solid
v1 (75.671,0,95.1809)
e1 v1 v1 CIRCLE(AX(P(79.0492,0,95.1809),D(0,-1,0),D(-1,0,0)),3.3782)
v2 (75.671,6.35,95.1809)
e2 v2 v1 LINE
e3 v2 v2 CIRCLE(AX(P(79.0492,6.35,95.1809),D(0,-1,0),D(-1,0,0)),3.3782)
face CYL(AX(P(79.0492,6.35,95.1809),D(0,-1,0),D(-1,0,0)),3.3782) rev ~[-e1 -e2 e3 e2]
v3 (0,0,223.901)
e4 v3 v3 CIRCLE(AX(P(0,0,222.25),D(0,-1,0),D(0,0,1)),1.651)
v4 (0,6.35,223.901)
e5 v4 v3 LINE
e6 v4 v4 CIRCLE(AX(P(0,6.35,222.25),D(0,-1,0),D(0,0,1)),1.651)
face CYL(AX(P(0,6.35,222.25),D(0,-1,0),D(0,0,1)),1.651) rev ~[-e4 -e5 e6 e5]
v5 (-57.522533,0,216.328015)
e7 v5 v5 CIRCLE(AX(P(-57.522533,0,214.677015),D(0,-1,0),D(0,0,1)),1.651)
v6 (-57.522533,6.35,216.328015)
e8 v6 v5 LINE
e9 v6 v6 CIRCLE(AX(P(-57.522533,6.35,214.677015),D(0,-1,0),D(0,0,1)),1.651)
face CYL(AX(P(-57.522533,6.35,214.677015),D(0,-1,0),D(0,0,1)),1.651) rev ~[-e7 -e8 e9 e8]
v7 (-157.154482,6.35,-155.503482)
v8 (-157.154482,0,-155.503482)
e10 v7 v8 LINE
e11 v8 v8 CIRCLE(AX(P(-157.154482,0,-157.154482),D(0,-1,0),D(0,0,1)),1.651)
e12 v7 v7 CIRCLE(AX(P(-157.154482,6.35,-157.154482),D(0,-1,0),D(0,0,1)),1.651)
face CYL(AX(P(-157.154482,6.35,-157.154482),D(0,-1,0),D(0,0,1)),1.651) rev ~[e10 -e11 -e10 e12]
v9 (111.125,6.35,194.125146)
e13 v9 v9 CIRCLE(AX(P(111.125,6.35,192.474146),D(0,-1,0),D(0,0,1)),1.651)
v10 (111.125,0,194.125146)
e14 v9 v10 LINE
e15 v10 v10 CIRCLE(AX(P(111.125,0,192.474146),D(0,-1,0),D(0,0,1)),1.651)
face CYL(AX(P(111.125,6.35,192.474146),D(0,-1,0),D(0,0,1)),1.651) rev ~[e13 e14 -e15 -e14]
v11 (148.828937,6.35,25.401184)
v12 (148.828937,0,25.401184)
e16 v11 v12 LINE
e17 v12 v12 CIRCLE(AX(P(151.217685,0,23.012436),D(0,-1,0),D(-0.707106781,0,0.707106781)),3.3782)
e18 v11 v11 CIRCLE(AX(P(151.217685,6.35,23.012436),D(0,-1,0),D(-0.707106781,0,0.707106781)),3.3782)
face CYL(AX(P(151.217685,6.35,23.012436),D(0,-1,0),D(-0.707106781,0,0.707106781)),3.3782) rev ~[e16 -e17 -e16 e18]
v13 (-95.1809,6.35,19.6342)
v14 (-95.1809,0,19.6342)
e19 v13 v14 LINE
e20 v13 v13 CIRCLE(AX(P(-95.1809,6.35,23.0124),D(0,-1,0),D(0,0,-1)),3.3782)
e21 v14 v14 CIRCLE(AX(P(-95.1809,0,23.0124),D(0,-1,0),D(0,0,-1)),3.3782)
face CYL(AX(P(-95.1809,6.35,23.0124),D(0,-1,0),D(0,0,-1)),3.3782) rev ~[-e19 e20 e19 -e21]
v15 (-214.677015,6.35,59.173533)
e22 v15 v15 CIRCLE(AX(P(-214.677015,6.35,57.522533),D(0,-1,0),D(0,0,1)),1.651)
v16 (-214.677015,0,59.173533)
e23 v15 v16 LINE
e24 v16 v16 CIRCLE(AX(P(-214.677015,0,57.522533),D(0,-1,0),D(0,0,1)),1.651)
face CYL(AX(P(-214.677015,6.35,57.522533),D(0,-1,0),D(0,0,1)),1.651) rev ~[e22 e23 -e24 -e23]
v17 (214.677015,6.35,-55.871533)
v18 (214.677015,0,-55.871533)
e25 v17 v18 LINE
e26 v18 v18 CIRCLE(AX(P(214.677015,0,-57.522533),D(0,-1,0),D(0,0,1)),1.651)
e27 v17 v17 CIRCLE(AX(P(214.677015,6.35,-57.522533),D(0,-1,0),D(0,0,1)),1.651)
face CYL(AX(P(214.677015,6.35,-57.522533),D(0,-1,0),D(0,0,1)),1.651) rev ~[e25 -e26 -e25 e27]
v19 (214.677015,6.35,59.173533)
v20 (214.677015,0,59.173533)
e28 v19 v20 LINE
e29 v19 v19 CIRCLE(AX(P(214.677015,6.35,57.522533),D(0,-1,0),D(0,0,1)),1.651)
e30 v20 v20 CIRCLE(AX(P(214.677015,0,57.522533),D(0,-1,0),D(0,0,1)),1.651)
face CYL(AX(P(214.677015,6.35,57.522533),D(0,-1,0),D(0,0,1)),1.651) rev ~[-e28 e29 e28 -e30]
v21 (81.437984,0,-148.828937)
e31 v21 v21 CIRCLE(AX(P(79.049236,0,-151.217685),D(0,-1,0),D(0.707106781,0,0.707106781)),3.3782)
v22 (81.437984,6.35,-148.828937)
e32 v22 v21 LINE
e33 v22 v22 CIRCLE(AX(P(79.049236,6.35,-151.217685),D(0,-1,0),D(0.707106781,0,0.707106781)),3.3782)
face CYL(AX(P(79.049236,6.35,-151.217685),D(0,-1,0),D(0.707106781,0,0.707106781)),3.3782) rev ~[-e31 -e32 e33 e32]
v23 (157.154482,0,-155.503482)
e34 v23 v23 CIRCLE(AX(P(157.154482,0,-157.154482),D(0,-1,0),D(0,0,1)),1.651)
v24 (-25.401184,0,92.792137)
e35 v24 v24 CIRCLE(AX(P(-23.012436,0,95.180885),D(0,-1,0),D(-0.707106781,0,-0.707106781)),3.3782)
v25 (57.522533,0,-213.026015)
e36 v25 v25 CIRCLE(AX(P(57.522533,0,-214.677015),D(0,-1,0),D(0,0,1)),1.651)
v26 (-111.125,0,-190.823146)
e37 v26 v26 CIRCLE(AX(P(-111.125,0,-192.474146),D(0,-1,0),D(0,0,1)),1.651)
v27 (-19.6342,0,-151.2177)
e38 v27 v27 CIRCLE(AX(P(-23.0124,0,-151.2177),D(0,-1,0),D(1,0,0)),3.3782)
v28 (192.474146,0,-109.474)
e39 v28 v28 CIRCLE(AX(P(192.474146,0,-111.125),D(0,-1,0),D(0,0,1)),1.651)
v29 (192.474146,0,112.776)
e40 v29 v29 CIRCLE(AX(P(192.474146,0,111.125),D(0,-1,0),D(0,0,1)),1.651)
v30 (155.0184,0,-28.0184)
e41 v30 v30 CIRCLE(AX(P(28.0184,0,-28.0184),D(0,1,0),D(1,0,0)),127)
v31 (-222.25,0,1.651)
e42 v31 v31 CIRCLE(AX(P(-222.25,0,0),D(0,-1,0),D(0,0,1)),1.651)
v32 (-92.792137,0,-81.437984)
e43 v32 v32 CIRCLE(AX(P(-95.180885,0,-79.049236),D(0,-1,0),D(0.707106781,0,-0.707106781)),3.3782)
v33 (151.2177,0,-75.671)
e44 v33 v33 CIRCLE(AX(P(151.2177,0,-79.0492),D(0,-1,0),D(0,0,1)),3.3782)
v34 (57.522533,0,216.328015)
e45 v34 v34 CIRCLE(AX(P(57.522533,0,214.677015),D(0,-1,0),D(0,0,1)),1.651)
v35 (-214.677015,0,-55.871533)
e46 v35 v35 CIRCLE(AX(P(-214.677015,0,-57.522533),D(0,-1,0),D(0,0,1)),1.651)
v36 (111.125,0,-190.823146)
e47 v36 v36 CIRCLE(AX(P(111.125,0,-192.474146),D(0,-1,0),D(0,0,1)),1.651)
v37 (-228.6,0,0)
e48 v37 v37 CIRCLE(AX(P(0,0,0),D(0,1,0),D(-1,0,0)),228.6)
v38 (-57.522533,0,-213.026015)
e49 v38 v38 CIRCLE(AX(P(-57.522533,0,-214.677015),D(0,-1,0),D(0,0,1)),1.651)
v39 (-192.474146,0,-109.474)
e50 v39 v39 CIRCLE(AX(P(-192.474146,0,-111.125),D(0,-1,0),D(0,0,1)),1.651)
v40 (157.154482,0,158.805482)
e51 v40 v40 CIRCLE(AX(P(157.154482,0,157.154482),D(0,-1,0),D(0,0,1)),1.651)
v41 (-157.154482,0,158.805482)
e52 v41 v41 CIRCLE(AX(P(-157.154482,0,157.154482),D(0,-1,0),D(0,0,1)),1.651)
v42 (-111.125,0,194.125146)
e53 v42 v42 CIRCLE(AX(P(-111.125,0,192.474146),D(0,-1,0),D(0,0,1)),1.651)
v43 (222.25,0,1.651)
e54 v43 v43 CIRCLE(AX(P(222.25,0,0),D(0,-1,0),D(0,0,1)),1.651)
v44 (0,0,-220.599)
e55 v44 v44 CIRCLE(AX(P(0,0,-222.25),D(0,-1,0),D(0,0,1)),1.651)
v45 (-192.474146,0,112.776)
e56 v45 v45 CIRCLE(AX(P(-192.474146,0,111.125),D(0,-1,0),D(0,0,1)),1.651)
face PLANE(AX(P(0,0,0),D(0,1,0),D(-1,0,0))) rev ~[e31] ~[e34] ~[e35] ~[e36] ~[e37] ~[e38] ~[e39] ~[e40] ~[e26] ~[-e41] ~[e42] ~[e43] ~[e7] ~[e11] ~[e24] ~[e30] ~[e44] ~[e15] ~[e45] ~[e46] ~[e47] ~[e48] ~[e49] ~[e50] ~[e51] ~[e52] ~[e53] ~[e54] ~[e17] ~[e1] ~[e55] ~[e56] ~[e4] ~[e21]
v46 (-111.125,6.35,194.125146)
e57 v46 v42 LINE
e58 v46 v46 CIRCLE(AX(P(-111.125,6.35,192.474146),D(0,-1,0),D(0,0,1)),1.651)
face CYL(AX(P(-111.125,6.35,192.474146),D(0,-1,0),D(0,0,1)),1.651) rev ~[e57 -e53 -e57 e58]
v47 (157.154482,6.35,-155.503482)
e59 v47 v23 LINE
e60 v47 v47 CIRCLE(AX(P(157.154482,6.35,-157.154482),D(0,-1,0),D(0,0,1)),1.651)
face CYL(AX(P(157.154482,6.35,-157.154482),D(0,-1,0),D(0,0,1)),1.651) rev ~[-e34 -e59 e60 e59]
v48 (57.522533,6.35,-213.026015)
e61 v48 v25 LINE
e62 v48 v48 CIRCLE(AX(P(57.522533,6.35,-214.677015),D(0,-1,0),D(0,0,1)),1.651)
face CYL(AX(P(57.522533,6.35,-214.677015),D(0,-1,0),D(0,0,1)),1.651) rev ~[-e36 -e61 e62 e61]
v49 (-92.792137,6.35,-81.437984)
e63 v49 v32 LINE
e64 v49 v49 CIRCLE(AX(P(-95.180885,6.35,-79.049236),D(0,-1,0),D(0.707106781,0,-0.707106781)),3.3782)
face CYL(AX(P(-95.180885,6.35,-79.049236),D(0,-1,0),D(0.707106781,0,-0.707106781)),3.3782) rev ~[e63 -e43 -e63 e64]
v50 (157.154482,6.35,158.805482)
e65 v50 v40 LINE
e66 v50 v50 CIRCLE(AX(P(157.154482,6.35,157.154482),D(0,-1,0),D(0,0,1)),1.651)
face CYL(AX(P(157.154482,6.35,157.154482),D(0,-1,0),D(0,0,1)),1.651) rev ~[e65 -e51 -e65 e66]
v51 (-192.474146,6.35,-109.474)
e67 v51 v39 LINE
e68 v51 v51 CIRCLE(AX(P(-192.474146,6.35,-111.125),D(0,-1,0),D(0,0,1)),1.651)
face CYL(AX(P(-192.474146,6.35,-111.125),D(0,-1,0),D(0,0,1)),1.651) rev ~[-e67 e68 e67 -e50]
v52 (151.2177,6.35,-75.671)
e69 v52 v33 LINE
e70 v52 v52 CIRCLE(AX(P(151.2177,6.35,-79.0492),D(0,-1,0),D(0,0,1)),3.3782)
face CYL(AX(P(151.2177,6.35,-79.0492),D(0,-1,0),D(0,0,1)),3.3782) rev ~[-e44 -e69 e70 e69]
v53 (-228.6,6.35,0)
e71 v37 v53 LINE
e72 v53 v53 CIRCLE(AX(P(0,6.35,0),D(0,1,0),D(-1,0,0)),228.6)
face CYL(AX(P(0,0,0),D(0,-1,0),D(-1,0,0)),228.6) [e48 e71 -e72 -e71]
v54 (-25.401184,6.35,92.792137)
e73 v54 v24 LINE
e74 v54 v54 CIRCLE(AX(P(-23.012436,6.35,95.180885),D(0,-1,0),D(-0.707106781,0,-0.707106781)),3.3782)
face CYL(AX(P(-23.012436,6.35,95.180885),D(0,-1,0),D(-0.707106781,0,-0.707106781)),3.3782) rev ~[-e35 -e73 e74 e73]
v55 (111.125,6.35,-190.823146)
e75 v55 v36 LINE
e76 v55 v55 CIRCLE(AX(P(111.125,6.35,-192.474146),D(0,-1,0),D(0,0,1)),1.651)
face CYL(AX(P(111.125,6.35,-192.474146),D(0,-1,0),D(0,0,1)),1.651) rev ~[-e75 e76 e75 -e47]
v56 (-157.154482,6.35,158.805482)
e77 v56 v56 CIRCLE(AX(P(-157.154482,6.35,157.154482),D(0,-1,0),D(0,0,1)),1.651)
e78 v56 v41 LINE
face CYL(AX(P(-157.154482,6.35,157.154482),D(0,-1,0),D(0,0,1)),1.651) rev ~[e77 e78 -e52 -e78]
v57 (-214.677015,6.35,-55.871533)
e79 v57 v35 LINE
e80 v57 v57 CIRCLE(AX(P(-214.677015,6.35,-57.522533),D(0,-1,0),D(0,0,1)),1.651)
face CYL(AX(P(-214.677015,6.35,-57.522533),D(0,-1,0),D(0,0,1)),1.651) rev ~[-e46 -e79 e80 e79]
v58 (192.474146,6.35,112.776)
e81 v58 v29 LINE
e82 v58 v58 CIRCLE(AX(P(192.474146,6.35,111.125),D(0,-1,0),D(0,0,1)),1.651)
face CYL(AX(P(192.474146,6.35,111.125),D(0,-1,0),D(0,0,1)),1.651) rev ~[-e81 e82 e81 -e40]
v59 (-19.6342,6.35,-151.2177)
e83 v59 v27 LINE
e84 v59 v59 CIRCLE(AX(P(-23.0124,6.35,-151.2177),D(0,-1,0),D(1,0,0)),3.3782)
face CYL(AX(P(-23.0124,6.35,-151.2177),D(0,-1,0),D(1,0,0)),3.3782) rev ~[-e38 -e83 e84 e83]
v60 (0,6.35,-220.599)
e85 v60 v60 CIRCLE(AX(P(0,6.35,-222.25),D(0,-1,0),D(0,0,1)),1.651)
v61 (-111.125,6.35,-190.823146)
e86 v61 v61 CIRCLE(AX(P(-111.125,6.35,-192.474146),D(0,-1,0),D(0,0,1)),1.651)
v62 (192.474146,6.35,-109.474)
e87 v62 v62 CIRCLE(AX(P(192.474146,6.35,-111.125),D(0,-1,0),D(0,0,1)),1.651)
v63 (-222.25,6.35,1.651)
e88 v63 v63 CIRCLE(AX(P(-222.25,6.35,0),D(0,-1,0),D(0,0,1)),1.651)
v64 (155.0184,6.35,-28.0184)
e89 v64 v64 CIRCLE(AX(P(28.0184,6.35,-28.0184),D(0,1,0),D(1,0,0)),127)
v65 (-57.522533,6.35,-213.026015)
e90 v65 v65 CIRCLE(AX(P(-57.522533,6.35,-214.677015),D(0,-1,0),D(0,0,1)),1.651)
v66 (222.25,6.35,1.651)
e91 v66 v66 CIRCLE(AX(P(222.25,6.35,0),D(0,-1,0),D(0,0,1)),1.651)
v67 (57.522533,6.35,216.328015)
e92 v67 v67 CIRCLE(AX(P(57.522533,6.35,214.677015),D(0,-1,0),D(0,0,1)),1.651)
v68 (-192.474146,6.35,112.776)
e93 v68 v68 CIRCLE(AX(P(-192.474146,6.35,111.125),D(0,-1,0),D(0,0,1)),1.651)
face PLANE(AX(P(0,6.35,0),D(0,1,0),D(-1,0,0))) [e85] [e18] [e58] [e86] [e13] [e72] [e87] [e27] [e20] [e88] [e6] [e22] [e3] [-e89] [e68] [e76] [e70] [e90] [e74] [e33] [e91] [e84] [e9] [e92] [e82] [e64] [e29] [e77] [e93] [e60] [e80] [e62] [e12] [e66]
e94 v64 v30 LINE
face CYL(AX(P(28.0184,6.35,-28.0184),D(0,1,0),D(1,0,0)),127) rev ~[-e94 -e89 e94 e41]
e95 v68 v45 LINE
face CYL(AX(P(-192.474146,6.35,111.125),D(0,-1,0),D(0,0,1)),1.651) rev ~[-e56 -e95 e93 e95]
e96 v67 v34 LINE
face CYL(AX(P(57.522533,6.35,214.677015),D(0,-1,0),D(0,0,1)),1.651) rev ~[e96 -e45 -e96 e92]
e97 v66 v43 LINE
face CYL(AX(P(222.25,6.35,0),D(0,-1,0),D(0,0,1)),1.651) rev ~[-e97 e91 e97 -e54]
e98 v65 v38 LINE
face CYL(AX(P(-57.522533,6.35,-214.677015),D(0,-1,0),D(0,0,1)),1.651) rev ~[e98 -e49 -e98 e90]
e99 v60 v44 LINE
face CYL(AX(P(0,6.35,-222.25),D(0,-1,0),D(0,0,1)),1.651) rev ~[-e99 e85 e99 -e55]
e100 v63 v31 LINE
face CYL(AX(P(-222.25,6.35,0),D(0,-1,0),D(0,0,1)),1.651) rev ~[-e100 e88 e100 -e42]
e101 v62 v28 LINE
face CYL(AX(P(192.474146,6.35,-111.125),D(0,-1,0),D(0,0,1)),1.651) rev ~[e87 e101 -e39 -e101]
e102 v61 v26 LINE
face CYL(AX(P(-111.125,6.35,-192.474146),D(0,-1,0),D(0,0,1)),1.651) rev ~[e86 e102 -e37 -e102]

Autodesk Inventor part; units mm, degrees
ref_plane "YZ Plane" through (0, 0, 0) normal (1, 0, 0) x (0, 1, 0)
ref_plane "XZ Plane" through (0, 0, 0) normal (0, 1, 0) x (-1, 0, 0)
ref_plane "XY Plane" through (0, 0, 0) normal (0, 0, 1) x (1, 0, 0)
sketch "Sketch1" plane through (0, 0, 0) normal (0, 1, 0) x (-1, 0, 0)
  circle A0 centre (0, 0) radius 228.6
  dimension "d0" = 457.2
extrude "Extrusion1" add sketch "Sketch1" along normal blind 6.35
sketch "Sketch7" plane through (0, 6.35, 0) normal (0, 1, 0) x (1, 0, 0)
  line L0 (0, 0) -> (0, 222.25)
  dimension "d42" = 222.25
hole "Hole3" at (0, 6.35, -222.25) direction (0, -1, 0) diameter 3.302 end up to surface thread size "8-32 UNC" class "2B" standard "ANSI Unified Screw Threads"
pattern_circular "Circular Pattern1" count 24 over 360 about axis through (0, 0, 0) along (0, 1, 0) of "Hole3"
sketch "Sketch8" plane through (0, 6.35, 0) normal (0, 1, 0) x (1, 0, 0)
  line L0 (0, 0) -> (28.0184, 28.0184) construction
  line L1 (0, 0) -> (39.624, 0) construction
  circle A0 centre (28.0184, 28.0184) radius 127
  dimension "d53" = 39.624
  dimension "d54" = 45
  dimension "d55" = 254
extrude "Extrusion4" cut sketch "Sketch8" against normal through all
sketch "Sketch9" plane through (0, 6.35, 0) normal (0, 1, 0) x (1, 0, 0)
  circle A0 centre (28.0184, 28.0184) radius 127 projected
  line L0 (28.0184, 28.0184) -> (151.2177, 79.0492)
  line L1 (28.0184, 28.0184) -> (161.3684, 28.0184) construction
  point P0 (0, 0)
  dimension "d58" = 133.35
  dimension "d59" = 22.5
hole "Hole4" at (151.2177, 6.35, -79.0492) direction (0, -1, 0) diameter 6.7564 end through all clearance for "Flat Head Machine Screw (82)" size "1/4" standard "Ansi Unified Screw Threads"
pattern_circular "Circular Pattern2" count 8 over 360 about axis through (28.0184, 6.35, -28.0184) along (0, -1, 0) of "Hole4"
properties part number "55K stage" material "Aluminum 6061"
